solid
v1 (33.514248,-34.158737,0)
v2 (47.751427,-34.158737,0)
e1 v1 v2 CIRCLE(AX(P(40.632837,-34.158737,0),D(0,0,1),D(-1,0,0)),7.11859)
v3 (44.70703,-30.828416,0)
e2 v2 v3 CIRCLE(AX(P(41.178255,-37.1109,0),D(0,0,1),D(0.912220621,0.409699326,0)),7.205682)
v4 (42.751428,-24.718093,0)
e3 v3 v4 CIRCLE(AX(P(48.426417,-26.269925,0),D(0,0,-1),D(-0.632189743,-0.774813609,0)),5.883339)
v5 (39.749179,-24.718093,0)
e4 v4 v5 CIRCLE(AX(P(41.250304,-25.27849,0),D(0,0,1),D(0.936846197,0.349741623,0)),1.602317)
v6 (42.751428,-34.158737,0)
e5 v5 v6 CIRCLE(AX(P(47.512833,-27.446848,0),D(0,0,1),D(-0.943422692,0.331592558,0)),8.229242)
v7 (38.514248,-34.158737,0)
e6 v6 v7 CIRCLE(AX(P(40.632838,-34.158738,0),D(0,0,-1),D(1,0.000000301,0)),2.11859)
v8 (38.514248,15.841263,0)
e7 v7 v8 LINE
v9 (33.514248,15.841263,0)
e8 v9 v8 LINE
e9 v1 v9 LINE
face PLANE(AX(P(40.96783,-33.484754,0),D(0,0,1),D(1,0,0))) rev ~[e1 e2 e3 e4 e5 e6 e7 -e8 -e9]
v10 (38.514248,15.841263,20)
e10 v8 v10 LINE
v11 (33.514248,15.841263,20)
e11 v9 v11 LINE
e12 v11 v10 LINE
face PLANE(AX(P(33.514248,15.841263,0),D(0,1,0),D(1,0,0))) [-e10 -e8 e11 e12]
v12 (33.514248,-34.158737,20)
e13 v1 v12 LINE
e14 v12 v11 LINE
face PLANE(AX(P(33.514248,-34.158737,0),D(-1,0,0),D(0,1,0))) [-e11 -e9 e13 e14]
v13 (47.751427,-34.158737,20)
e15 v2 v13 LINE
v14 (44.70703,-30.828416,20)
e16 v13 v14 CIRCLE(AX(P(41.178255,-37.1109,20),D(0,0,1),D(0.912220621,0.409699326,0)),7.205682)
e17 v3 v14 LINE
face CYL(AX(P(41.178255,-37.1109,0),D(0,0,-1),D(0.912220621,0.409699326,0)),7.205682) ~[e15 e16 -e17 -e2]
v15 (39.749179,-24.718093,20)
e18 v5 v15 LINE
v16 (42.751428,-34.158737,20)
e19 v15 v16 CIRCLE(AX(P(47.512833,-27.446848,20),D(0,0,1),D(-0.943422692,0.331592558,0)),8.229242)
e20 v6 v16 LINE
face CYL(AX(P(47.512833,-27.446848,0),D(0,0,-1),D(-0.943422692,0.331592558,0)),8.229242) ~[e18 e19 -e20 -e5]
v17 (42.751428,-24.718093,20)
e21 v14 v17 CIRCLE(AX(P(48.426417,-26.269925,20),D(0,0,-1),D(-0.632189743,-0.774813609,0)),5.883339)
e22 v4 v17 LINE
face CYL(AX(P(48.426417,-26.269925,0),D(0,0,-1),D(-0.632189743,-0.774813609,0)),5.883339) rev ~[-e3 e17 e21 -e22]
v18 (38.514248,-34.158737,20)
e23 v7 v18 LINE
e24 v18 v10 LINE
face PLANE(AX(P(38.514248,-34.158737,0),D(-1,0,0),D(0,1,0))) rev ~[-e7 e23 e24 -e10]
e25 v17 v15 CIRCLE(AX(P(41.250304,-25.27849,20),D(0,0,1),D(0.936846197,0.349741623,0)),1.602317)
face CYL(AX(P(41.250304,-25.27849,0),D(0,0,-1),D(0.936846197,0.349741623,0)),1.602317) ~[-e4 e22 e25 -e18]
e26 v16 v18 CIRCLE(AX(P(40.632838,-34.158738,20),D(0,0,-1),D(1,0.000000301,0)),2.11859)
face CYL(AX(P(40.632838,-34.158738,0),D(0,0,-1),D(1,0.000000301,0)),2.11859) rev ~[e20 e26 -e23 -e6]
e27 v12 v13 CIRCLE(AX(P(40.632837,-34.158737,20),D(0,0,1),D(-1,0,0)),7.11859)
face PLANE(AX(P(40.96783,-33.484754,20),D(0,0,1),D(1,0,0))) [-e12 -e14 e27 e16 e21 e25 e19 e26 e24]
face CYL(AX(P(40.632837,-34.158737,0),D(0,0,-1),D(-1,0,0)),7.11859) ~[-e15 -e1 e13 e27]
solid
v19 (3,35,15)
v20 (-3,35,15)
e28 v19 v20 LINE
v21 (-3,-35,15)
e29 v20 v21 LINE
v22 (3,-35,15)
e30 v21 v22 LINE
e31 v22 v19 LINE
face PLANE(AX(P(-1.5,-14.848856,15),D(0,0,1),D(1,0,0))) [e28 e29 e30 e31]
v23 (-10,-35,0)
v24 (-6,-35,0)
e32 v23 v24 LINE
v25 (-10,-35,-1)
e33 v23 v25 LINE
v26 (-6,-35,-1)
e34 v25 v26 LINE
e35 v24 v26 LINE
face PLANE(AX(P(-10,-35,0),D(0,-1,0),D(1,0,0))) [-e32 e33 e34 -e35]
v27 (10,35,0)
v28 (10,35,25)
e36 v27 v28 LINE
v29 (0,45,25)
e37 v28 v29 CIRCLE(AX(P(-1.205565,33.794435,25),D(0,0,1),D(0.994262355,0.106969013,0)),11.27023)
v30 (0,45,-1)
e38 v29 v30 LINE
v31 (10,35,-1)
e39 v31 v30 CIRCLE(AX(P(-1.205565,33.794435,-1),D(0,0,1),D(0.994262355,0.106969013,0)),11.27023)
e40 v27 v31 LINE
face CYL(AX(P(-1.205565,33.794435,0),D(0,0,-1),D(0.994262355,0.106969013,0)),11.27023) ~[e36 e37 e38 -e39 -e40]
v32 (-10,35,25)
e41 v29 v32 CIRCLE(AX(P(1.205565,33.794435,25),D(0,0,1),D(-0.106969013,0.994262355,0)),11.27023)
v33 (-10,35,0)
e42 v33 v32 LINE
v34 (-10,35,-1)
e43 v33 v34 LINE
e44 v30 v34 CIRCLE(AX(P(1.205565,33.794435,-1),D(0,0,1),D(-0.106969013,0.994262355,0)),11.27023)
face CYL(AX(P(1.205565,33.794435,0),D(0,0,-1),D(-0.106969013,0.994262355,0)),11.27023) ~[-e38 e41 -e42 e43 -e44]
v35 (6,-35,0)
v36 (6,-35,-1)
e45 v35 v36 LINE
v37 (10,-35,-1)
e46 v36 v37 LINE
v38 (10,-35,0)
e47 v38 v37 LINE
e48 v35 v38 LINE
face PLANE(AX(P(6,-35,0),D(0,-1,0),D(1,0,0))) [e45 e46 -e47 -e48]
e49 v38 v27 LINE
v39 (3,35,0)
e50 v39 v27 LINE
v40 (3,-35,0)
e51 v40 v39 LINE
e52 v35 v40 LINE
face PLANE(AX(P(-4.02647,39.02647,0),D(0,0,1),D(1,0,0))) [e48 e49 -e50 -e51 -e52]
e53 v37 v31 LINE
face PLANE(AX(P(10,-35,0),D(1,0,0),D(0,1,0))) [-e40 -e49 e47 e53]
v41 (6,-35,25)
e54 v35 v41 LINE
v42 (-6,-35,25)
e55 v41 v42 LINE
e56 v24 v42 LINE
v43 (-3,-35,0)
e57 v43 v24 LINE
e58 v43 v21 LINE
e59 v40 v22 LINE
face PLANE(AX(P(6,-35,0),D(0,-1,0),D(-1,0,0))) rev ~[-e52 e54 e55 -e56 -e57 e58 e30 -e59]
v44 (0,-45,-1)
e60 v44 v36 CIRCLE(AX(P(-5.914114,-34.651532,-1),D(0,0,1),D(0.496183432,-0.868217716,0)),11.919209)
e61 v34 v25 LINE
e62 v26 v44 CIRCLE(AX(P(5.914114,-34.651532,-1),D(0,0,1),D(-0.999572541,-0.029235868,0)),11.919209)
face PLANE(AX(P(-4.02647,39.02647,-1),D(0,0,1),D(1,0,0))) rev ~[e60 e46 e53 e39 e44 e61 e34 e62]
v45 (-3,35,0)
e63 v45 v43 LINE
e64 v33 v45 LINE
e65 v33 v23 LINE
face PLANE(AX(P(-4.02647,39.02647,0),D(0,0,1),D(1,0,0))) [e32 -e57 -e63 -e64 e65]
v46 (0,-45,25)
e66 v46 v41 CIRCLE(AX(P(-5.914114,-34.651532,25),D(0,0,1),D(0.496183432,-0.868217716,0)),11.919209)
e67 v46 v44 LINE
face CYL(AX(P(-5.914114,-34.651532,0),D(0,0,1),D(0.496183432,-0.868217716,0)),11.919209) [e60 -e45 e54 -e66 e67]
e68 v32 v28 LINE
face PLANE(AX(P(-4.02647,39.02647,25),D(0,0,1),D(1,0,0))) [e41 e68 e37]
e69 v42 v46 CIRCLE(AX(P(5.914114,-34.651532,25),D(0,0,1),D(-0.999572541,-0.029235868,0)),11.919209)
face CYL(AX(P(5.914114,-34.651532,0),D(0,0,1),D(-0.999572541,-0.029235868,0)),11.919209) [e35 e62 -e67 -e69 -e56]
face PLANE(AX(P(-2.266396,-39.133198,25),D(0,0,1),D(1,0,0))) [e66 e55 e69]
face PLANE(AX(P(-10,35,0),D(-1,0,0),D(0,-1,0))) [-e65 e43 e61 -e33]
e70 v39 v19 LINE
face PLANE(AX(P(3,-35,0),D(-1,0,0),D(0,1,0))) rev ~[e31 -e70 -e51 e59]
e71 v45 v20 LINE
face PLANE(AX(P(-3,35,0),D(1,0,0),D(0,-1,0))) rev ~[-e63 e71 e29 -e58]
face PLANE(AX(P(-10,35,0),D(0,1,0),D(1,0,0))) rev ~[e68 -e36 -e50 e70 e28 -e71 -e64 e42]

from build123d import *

# Parameters (mm, degrees)
F0_W     = 3
F0_H     = 29.6977118962
F0_H_2   = 40.3022881038
F1_DEPTH = 1
F2_DEPTH = 15
F3_DEPTH = 25
F4_W     = 5
F4_H     = 50
F5_DEPTH = 20


# Not quite as in the source:
# - ends of sketch curves that miss each other by under 0.0002 mm in the source are joined


with BuildPart() as f1:
    # F0 (on Top) → F1 (new body)
    with BuildSketch(Plane.XY):
        with BuildLine():
            Line((-3, 35), (0, 35))
            Line((0, 35), (0, 45))
            ThreePointArc((0, 45), (-6.7636906533, 41.7636906533), (-10, 35))
            Line((-10, 35), (-3, 35))
        make_face()
        with BuildLine():
            Line((0, 45), (0, 35))
            Line((0, 35), (3, 35))
            Line((3, 35), (10, 35))
            ThreePointArc((10, 35), (6.7636906533, 41.7636906533), (0, 45))
        make_face()
        with Locations((-1.5, 20.1511440519)):
            Rectangle(F0_W, F0_H)
        with Locations((-1.5, -14.8488559481)):
            Rectangle(F0_W, F0_H_2)
        with BuildLine():
            Line((3, -35), (0, -35))
            Line((0, -35), (0, -45))
            ThreePointArc((0, -45), (4.3065233729, -40.7839140238), (6, -35))
            Line((6, -35), (3, -35))
        make_face()
        Polygon((10, 35), (3, 35), (3, -35), (6, -35), (10, -35), align=None)
        Polygon((3, 35), (0, 35), (0, 5.3022881038), (0, -35), (3, -35), align=None)
        Polygon((-3, 5.3022881038), (-3, 35), (-10, 35), (-10, -35), (-6, -35), (-3, -35), align=None)
        with BuildLine():
            Line((0, -45), (0, -35))
            Line((0, -35), (-3, -35))
            Line((-3, -35), (-6, -35))
            ThreePointArc((-6, -35), (-4.3065233729, -40.7839140238), (0, -45))
        make_face()
    extrude(amount=-F1_DEPTH)

    # F0 (on Top) → F2 (join)
    with BuildSketch(Plane.XY):
        with Locations((-1.5, -14.8488559481)):
            Rectangle(F0_W, F0_H_2)
        Polygon((3, 35), (0, 35), (0, 5.3022881038), (0, -35), (3, -35), align=None)
        with Locations((-1.5, 20.1511440519)):
            Rectangle(F0_W, F0_H)
    extrude(amount=F2_DEPTH)

    # F0 (on Top) → F3 (join)
    with BuildSketch(Plane.XY):
        with BuildLine():
            Line((-3, 35), (0, 35))
            Line((0, 35), (0, 45))
            ThreePointArc((0, 45), (-6.7636906533, 41.7636906533), (-10, 35))
            Line((-10, 35), (-3, 35))
        make_face()
        with BuildLine():
            Line((0, 45), (0, 35))
            Line((0, 35), (3, 35))
            Line((3, 35), (10, 35))
            ThreePointArc((10, 35), (6.7636906533, 41.7636906533), (0, 45))
        make_face()
        with BuildLine():
            Line((0, -45), (0, -35))
            Line((0, -35), (-3, -35))
            Line((-3, -35), (-6, -35))
            ThreePointArc((-6, -35), (-4.3065233729, -40.7839140238), (0, -45))
        make_face()
        with BuildLine():
            Line((3, -35), (0, -35))
            Line((0, -35), (0, -45))
            ThreePointArc((0, -45), (4.3065233729, -40.7839140238), (6, -35))
            Line((6, -35), (3, -35))
        make_face()
    extrude(amount=F3_DEPTH)


with BuildPart() as f5:
    # F4 (on Top) → F5 (new body)
    with BuildSketch(Plane.XY):
        with BuildLine():
            Line((38.5142476857, -34.1587369061), (33.5142476857, -34.1587369061))
            ThreePointArc((33.5142476857, -34.1587369061), (40.6328371912, -41.2773264116), (47.7514266968, -34.1587369061))
            ThreePointArc((47.7514266968, -34.1587369061), (46.4966279337, -32.249134599), (44.7070300579, -30.8284163475))
            ThreePointArc((44.7070300579, -30.8284163475), (42.8230618595, -28.0632723139), (42.7514279717, -24.7180927545))
            ThreePointArc((42.7514279717, -24.7180927545), (41.2503035036, -23.6761727856), (39.7491790354, -24.7180927545))
            ThreePointArc((39.7491790354, -24.7180927545), (39.6705937247, -29.9407833051), (42.7514279717, -34.1587369061))
            ThreePointArc((42.7514279717, -34.1587369061), (40.6328371912, -36.2773276865), (38.5142476857, -34.1587369061))
        make_face()
        with Locations((36.0142476857, -9.1587369061)):
            Rectangle(F4_W, F4_H)
    extrude(amount=F5_DEPTH)


solid = Compound([f1.part, f5.part])
